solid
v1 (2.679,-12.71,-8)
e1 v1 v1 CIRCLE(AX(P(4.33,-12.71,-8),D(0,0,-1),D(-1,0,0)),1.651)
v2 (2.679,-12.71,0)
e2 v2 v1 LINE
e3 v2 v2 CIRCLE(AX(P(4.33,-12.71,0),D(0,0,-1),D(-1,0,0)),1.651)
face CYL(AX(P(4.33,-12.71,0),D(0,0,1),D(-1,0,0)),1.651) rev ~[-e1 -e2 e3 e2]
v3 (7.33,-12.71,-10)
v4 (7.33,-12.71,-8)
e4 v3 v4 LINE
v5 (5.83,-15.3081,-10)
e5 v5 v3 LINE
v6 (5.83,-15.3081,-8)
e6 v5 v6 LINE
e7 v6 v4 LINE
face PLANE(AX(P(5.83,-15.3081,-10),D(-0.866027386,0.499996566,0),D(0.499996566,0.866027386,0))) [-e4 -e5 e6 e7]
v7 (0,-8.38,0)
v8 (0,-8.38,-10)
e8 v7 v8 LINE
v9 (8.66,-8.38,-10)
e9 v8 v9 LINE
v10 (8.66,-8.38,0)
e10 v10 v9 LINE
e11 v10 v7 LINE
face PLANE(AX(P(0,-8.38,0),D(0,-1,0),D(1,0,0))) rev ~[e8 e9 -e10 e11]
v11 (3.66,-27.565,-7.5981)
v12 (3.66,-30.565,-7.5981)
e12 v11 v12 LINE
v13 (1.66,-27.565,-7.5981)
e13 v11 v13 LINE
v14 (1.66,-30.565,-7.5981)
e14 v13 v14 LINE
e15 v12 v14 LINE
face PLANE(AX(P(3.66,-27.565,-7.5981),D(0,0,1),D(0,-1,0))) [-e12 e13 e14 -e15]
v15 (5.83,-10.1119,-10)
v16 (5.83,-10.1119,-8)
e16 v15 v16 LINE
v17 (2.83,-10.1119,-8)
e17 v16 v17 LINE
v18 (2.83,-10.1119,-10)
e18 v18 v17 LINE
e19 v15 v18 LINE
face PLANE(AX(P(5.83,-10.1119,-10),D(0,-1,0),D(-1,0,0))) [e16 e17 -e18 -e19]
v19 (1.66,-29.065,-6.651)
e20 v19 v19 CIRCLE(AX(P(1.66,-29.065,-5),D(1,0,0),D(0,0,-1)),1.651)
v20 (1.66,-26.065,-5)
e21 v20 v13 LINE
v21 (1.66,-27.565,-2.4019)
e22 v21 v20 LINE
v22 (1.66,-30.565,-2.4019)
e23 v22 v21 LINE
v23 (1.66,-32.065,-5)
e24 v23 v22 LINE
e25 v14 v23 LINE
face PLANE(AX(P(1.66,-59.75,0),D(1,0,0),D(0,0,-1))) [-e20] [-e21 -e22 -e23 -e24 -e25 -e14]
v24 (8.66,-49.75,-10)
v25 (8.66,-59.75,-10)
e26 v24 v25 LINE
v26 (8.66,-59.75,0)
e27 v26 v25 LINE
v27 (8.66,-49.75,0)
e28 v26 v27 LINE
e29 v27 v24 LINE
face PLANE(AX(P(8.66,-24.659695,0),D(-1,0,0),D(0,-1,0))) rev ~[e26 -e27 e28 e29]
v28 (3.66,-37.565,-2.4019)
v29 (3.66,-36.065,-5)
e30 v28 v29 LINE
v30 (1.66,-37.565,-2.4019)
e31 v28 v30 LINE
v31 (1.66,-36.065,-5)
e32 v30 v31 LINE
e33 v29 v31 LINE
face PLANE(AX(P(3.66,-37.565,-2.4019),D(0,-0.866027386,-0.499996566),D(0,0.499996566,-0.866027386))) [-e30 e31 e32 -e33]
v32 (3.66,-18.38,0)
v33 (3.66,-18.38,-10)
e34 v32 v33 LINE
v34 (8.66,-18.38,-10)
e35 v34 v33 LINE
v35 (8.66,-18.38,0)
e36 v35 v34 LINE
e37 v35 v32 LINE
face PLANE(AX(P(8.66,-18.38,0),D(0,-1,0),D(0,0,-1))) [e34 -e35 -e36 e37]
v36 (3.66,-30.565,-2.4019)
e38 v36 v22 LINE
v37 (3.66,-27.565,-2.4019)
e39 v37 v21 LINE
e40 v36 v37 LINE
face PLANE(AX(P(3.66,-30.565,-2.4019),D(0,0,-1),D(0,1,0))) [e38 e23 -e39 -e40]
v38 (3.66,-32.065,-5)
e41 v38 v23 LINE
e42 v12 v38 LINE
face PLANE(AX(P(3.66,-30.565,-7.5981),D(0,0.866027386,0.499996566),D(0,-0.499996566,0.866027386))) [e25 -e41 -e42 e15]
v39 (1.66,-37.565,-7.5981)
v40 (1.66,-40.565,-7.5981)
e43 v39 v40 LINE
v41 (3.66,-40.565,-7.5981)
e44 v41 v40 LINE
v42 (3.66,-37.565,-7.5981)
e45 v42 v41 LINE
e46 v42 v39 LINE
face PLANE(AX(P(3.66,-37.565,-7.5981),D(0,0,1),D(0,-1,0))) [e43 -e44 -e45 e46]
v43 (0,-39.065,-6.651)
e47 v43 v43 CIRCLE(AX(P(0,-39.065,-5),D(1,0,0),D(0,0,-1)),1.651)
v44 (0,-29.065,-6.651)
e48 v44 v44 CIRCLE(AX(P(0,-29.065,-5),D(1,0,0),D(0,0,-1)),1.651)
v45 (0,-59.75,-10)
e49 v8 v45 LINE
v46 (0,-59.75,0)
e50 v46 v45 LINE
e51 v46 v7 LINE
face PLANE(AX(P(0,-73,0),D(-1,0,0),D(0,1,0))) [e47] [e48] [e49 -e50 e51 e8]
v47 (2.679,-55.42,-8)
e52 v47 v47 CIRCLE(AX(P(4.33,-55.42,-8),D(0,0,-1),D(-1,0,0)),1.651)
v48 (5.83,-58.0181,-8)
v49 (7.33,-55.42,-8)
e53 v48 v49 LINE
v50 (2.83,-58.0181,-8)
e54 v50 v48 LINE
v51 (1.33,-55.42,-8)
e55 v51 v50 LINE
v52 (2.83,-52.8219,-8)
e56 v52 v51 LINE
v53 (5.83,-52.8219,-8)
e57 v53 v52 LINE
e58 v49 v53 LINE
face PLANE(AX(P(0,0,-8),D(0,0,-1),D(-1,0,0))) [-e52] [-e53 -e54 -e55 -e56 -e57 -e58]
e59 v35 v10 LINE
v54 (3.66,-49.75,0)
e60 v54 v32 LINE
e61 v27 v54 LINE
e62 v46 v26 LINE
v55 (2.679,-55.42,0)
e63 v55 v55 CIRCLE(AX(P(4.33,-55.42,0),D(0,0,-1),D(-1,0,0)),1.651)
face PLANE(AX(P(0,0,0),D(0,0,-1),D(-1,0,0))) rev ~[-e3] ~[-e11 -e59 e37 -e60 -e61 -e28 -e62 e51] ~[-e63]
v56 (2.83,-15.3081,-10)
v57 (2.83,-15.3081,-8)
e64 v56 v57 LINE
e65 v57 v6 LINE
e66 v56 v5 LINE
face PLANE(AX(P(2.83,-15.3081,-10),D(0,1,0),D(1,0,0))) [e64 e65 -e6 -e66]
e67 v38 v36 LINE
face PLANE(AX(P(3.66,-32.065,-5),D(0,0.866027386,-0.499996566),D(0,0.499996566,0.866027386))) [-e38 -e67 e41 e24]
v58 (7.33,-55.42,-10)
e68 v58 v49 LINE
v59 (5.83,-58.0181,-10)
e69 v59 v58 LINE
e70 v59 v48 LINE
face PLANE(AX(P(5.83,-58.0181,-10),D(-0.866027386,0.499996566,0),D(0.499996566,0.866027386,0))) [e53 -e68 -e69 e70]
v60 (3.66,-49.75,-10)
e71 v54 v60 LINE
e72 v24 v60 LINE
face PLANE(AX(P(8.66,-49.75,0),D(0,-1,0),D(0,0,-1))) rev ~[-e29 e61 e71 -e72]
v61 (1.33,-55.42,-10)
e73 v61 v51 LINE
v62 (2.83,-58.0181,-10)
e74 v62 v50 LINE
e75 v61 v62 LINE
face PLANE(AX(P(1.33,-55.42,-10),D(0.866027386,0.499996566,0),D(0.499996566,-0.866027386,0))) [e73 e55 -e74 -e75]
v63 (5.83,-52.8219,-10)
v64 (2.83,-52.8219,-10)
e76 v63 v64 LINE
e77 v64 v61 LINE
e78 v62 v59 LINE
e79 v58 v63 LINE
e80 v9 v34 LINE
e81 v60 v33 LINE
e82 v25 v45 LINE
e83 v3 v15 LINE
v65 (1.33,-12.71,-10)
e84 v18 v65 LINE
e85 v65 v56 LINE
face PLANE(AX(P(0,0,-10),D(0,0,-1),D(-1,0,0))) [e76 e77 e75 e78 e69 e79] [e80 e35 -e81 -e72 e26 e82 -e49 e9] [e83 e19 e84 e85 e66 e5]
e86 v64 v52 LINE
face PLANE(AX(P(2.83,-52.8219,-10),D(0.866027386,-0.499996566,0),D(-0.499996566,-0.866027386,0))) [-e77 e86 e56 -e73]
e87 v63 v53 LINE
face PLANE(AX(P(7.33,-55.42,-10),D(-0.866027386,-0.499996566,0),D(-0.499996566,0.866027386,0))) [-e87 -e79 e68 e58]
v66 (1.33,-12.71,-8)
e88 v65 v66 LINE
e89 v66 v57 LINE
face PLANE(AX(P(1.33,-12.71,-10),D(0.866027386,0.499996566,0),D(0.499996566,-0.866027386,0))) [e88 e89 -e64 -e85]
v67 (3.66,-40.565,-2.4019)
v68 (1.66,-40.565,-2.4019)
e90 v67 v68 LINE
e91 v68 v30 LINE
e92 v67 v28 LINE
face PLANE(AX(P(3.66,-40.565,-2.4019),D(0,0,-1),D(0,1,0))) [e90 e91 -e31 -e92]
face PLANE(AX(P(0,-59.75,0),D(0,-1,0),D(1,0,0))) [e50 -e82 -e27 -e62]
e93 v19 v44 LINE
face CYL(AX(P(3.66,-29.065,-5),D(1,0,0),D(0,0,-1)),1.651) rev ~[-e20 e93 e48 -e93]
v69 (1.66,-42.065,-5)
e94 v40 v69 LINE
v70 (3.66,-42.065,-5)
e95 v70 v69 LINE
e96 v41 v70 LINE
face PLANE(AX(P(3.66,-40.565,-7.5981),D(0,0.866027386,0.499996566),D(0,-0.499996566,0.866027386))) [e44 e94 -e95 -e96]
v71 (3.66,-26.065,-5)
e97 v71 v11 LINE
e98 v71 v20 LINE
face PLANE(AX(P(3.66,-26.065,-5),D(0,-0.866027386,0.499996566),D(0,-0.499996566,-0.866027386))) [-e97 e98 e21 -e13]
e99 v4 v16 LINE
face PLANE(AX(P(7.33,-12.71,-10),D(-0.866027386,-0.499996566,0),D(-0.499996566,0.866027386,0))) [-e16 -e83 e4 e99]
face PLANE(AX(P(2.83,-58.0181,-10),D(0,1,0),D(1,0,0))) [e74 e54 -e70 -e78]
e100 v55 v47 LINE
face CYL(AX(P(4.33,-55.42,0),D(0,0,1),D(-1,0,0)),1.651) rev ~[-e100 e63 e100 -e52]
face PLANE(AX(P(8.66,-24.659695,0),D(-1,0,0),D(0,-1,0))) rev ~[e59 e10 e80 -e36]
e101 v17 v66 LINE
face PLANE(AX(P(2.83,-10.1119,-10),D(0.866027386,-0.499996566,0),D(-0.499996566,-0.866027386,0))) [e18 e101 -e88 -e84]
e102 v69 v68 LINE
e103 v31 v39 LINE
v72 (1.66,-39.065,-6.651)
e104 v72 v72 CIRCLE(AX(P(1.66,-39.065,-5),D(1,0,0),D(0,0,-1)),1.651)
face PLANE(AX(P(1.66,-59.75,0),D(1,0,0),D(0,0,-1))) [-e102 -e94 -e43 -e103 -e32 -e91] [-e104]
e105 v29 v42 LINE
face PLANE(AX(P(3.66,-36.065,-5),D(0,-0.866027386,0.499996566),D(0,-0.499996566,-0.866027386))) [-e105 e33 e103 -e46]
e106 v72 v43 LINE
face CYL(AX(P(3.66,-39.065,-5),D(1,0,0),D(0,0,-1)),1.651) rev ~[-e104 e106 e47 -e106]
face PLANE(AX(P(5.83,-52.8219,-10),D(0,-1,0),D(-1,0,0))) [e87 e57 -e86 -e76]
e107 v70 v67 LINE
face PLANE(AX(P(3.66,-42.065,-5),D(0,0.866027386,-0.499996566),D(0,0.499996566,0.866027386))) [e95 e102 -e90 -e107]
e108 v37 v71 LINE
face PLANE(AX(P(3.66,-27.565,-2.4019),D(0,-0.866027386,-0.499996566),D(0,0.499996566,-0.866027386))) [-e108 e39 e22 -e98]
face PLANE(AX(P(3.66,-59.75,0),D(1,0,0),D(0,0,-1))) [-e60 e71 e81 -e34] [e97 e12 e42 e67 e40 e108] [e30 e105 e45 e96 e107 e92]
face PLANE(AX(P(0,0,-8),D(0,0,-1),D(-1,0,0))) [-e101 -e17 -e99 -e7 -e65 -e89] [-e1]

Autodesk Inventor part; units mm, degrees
ref_plane "YZ Plane" through (0, 0, 0) normal (1, 0, 0) x (0, 1, 0)
ref_plane "XZ Plane" through (0, 0, 0) normal (0, 1, 0) x (-1, 0, 0)
ref_plane "XY Plane" through (0, 0, 0) normal (0, 0, 1) x (1, 0, 0)
sketch "Sketch1" plane through (0, 0, 0) normal (0, 0, 1) x (1, 0, 0)
  line L0 (0, 0) -> (41.5, 0)
  line L1 (41.5, 0) -> (41.5, -73)
  line L2 (41.5, -73) -> (0, -73)
  line L3 (0, -73) -> (0, 0)
  line L4 (0, -73) -> (3.11, -73)
  line L5 (0, -73) -> (3.11, -73) construction
  line L6 (3.11, -73) -> (3.11, -69.85)
  line L7 (3.11, -73) -> (6.26, -73) construction
  line L8 (3.11, -69.85) -> (14.54, -69.85)
  line L9 (14.54, -69.85) -> (19.65, -69.85)
  line L10 (19.65, -69.85) -> (31.08, -69.85)
  circle A0 centre (3.11, -69.85) radius 1.6
  circle A1 centre (14.54, -69.85) radius 1.6
  circle A2 centre (19.65, -69.85) radius 1.6
  circle A3 centre (31.08, -69.85) radius 1.6
  line L11 (3.11, -69.85) -> (3.11, -55.42)
  line L12 (3.11, -69.85) -> (17.54, -69.85) construction
  line L13 (0, -73) -> (4.33, -73)
  line L14 (0, -73) -> (4.33, -73) construction
  line L15 (4.33, -73) -> (4.33, -53.49)
  line L16 (3.11, -55.42) -> (6.6479, -55.42)
  circle A4 centre (4.33, -55.42) radius 1.651
  line L17 (4.33, -55.42) -> (4.33, -37.69)
  line L18 (4.33, -55.42) -> (22.06, -55.42) construction
  line L19 (4.33, -55.42) -> (29.68, -55.42)
  line L20 (4.33, -55.42) -> (29.68, -55.42) construction
  circle A5 centre (4.33, -37.69) radius 1.651
  circle A6 centre (29.68, -55.42) radius 1.651
  line L21 (4.33, -37.69) -> (39.0376, -37.69)
  line L22 (29.68, -55.42) -> (29.68, -25.3245)
  circle A7 centre (29.68, -37.69) radius 1.651
  line L23 (4.33, -37.69) -> (4.33, -30.44)
  line L24 (4.33, -37.69) -> (11.58, -37.69) construction
  line L25 (4.33, -30.44) -> (4.33, -12.71)
  line L26 (4.33, -30.44) -> (29.68, -30.44)
  line L27 (4.33, -30.44) -> (29.68, -30.44) construction
  line L28 (4.33, -12.71) -> (29.68, -12.71)
  circle A8 centre (29.48, -12.71) radius 1.651
  circle A9 centre (4.33, -12.71) radius 1.651
  circle A10 centre (4.33, -30.44) radius 1.651
  circle A11 centre (29.68, -30.44) radius 1.651
  dimension "d0" = 41.5
  dimension "d1" = 73
  dimension "d2" = 3.11
  dimension "d3" = 0
  dimension "d4" = 3.15
  dimension "d5" = 90
  dimension "d6" = 11.43
  dimension "d7" = 90
  dimension "d9" = 5.11
  dimension "d10" = 11.43
  dimension "d11" = 180
  dimension "d12" = 3.2
  dimension "d13" = 3.2
  dimension "d14" = 3.2
  dimension "d15" = 3.2
  dimension "d18" = 14.43
  dimension "d19" = 90
  dimension "d20" = 4.33
  dimension "d21" = 0
  dimension "d22" = 3.302
  dimension "d23" = 17.73
  dimension "d24" = 90
  dimension "d25" = 25.35
  dimension "d26" = 0
  dimension "d27" = 3.302
  dimension "d28" = 3.302
  dimension "d29" = 3.302
  dimension "d30" = 7.25
  dimension "d31" = 90
  dimension "d32" = 17.73
  dimension "d33" = 180
  dimension "d34" = 25.35
  dimension "d35" = 0
  dimension "d36" = 25.35
  dimension "d37" = 3.302
  dimension "d38" = 3.302
  dimension "d39" = 3.302
  dimension "d40" = 3.302
extrude "Extrusion2" add sketch "Sketch1" along normal blind 2 contours L0 L1 L2 L15 A0 A4 L16 L19 A6 L22 A7 A11 L26 A10 L23 A5 L17 L11 L6 L3 | L6 A0 L15 L2 | L11 A4 L15 A0 | L15 L17 A5 L21 A7 L22 A6 L19 L16 A4 | L23 A10 L26 A11 L22 A7 L21 A5
sketch "Sketch3" plane through (0, 0, 2) normal (0, 0, 1) x (1, 0, 0)
  circle A0 centre (4.33, -55.42) radius 1.651 projected
  circle A1 centre (4.33, -55.42) radius 3.5
  circle A2 centre (29.68, -55.42) radius 1.651 projected
  circle A3 centre (29.68, -55.42) radius 3.5
  circle A4 centre (4.33, -12.71) radius 1.651 projected
  circle A5 centre (4.33, -12.71) radius 3.5
  circle A6 centre (29.48, -12.71) radius 1.651 projected
  circle A7 centre (29.48, -12.71) radius 3.5
  point P0 (0, 0)
  dimension "d46" = 7
  dimension "d47" = 7
  dimension "d48" = 7
  dimension "d49" = 7
extrude "Extrusion4" add sketch "Sketch3" along normal blind 10
sketch "Sketch8" plane through (0, 0, 0) normal (0, 0, -1) x (-1, 0, 0)
  circle A0 centre (-4.33, -12.71) radius 1.651 projected
  circle A1 centre (-4.33, -12.71) radius 12.71
  line L0 (-41.5, 0) -> (0, 0) projected
  line L1 (8.38, -12.71) -> (8.38, -69.4926)
  circle A2 centre (-4.33, -55.42) radius 1.651 projected
  circle A3 centre (-4.33, -55.42) radius 12.71
  circle A4 centre (-4.33, -55.42) radius 4.33
  circle A5 centre (-4.33, -12.71) radius 4.33
  line L2 (0, -55.42) -> (0, -59.75)
  line L3 (0, -59.75) -> (-4.33, -59.75)
  line L4 (0, 0) -> (0, -73) projected
  line L5 (0, -12.71) -> (0, -8.38)
  line L6 (0, -8.38) -> (-4.33, -8.38)
  line L7 (0, -8.38) -> (-8.66, -8.38)
  line L8 (-8.66, -8.38) -> (-8.66, -59.75)
  line L9 (-8.66, -59.75) -> (0, -59.75)
  line L10 (0, -59.75) -> (0, -8.38)
  circle A6 centre (-4.33, -12.71) radius 1.651
  circle A7 centre (-4.33, -55.42) radius 1.651
extrude "Extrusion5" add sketch "Sketch8" along normal blind 10 contours L4 A3 L8 A1 | A1 L8 A5 L4 | L4 A5 L6 | A5 | L4 A4 L8 A3 | A5 L8 L7 | L2 L3 A4 | A4 | A4 L9 L8
sketch "Sketch9" plane through (8.66, -59.75, 0) normal (1, 0, 0) x (0, 0, -1)
  line L0 (10, 0) -> (10, 51.37) projected
  line L1 (10, 25.685) -> (0, 25.685)
  line L2 (0, 25.685) -> (0, 35.685)
  line L3 (0, 35.685) -> (10, 35.685)
  line L4 (10, 35.685) -> (10, 25.685)
  line L5 (10, 25.685) -> (0, 25.685)
  line L6 (0, 25.685) -> (0, 15.685)
  line L7 (0, 15.685) -> (10, 15.685)
  line L8 (10, 15.685) -> (10, 25.685)
  line L9 (10, 25.685) -> (0, 35.685)
  line L10 (10, 25.685) -> (0, 15.685)
  line L11 (0, 51.37) -> (10, 51.37) projected
  line L12 (10, 51.37) -> (0, 51.37)
  line L13 (0, 51.37) -> (0, 41.37)
  line L14 (0, 41.37) -> (10, 41.37)
  line L15 (10, 41.37) -> (10, 51.37)
  line L16 (10, 0) -> (0, 0)
  line L17 (0, 0) -> (0, 10)
  line L18 (0, 10) -> (10, 10)
  line L19 (10, 10) -> (10, 0)
  line L20 (10, 41.37) -> (0, 41.37)
  line L21 (0, 41.37) -> (0, 10)
  line L22 (0, 10) -> (10, 10)
  line L23 (10, 10) -> (10, 41.37)
  point P0 (0, 59.75)
  dimension "d55" = 10
  dimension "d56" = 10
  dimension "d57" = 10
  dimension "d58" = 10
  dimension "d59" = 10
  dimension "d60" = 10
  dimension "d61" = 10
  dimension "d62" = 10
extrude "Extrusion6" cut sketch "Sketch9" against normal blind 5 contours L18 L21 L7 L0 | L7 L10 L0 | L9 L3 L0 | L10 L6 L1 | L1 L2 L9 | L3 L21 L14 L0
sketch "Sketch11" plane through (3.66, -59.75, 0) normal (1, 0, 0) x (0, 0, -1)
  line L0 (10, 51.37) -> (10, 41.37) projected
  line L1 (10, 41.37) -> (0, 41.37)
  line L2 (0, 41.37) -> (0, 31.37)
  line L3 (0, 31.37) -> (10, 31.37)
  line L4 (10, 31.37) -> (10, 41.37)
  line L5 (10, 41.37) -> (10, 10) projected
  line L6 (10, 25.685) -> (0, 25.685)
  line L7 (0, 25.685) -> (0, 35.685)
  line L8 (0, 35.685) -> (10, 35.685)
  line L9 (10, 35.685) -> (10, 25.685)
  line L10 (10, 25.685) -> (0, 25.685)
  line L11 (0, 25.685) -> (0, 35.685)
  line L12 (0, 35.685) -> (10, 35.685)
  line L13 (10, 35.685) -> (10, 25.685)
  line L14 (10, 25.685) -> (0, 25.685)
  line L15 (0, 25.685) -> (0, 15.685)
  line L16 (0, 15.685) -> (10, 15.685)
  line L17 (10, 15.685) -> (10, 25.685)
  line L18 (10, 25.685) -> (0, 35.685)
  line L19 (10, 25.685) -> (0, 15.685)
  circle A0 centre (5, 30.685) radius 1.651
  circle A1 centre (5, 20.685) radius 1.651
  point P0 (0, 59.75)
  dimension "d65" = 10
  dimension "d66" = 10
  dimension "d67" = 10
  dimension "d68" = 10
  dimension "d69" = 10
  dimension "d70" = 10
  dimension "d71" = 10
  dimension "d72" = 10
  dimension "d73" = 3.302
  dimension "d74" = 3.302
extrude "Extrusion7" cut sketch "Sketch11" against normal blind 5 contours A0 L3 L18 | L18 L3 A0 | A0 L18 L3 | L3 L18 A0 | A1 L19 | L19 A1
sketch "Sketch12" plane through (0, 0, 0) normal (0, 0, -1) x (-1, 0, 0)
  line L0 (-41.5, -73) -> (-41.5, 0) projected
  line L1 (-41.5, -73) -> (0, -73)
  line L2 (0, -73) -> (0, 0)
  line L3 (0, 0) -> (-41.5, 0)
  line L4 (-41.5, 0) -> (-41.5, -73)
extrude "Extrusion8" cut sketch "Sketch12" against normal blind 30
sketch "Sketch14" plane through (3.66, -59.75, 0) normal (1, 0, 0) x (0, 0, -1)
  point P0 (0, 59.75)
sketch "Sketch15" plane through (0, 0, -10) normal (0, 0, -1) x (-1, 0, 0)
  circle A0 centre (-4.33, -55.42) radius 1.651 projected
  circle A1 centre (-4.33, -55.42) radius 1.651
  circle A2 centre (-4.33, -12.71) radius 1.651 projected
  circle A3 centre (-4.33, -12.71) radius 1.651
  circle A4 centre (-4.33, -12.71) radius 3
  circle A5 centre (-4.33, -55.42) radius 3
  line L0 (-7.33, -55.42) -> (-5.83, -52.8219)
  line L1 (-5.83, -52.8219) -> (-2.83, -52.8219)
  line L2 (-2.83, -52.8219) -> (-1.33, -55.42)
  line L3 (-1.33, -55.42) -> (-2.83, -58.0181)
  line L4 (-2.83, -58.0181) -> (-5.83, -58.0181)
  line L5 (-5.83, -58.0181) -> (-7.33, -55.42)
  line L6 (-7.33, -12.71) -> (-5.83, -10.1119)
  line L7 (-5.83, -10.1119) -> (-2.83, -10.1119)
  line L8 (-2.83, -10.1119) -> (-1.33, -12.71)
  line L9 (-1.33, -12.71) -> (-2.83, -15.3081)
  line L10 (-2.83, -15.3081) -> (-5.83, -15.3081)
  line L11 (-5.83, -15.3081) -> (-7.33, -12.71)
  point P0 (0, 0)
  dimension "d79" = 6
  dimension "d80" = 6
extrude "Extrusion9" cut sketch "Sketch15" against normal blind 2 contours L9 L10 L11 L6 L7 L8 | L3 L4 L5 L0 L1 L2
sketch "Sketch16" plane through (3.66, -59.75, 0) normal (1, 0, 0) x (0, 0, -1)
  circle A0 centre (5, 20.685) radius 1.651 projected
  circle A1 centre (5, 20.685) radius 3
  circle A2 centre (5, 30.685) radius 1.651 projected
  circle A3 centre (5, 30.685) radius 3
  line L0 (5, 17.685) -> (2.4019, 19.185)
  line L1 (2.4019, 19.185) -> (2.4019, 22.185)
  line L2 (2.4019, 22.185) -> (5, 23.685)
  line L3 (5, 23.685) -> (7.5981, 22.185)
  line L4 (7.5981, 22.185) -> (7.5981, 19.185)
  line L5 (7.5981, 19.185) -> (5, 17.685)
  line L6 (5, 27.685) -> (2.4019, 29.185)
  line L7 (2.4019, 29.185) -> (2.4019, 32.185)
  line L8 (2.4019, 32.185) -> (5, 33.685)
  line L9 (5, 33.685) -> (7.5981, 32.185)
  line L10 (7.5981, 32.185) -> (7.5981, 29.185)
  line L11 (7.5981, 29.185) -> (5, 27.685)
  point P0 (0, 59.75)
  dimension "d83" = 6
  dimension "d84" = 6
extrude "Extrusion10" cut sketch "Sketch16" against normal blind 2 contours L4 L5 L0 L1 L2 L3 | L10 L11 L6 L7 L8 L9
properties part number "mountBrace"
